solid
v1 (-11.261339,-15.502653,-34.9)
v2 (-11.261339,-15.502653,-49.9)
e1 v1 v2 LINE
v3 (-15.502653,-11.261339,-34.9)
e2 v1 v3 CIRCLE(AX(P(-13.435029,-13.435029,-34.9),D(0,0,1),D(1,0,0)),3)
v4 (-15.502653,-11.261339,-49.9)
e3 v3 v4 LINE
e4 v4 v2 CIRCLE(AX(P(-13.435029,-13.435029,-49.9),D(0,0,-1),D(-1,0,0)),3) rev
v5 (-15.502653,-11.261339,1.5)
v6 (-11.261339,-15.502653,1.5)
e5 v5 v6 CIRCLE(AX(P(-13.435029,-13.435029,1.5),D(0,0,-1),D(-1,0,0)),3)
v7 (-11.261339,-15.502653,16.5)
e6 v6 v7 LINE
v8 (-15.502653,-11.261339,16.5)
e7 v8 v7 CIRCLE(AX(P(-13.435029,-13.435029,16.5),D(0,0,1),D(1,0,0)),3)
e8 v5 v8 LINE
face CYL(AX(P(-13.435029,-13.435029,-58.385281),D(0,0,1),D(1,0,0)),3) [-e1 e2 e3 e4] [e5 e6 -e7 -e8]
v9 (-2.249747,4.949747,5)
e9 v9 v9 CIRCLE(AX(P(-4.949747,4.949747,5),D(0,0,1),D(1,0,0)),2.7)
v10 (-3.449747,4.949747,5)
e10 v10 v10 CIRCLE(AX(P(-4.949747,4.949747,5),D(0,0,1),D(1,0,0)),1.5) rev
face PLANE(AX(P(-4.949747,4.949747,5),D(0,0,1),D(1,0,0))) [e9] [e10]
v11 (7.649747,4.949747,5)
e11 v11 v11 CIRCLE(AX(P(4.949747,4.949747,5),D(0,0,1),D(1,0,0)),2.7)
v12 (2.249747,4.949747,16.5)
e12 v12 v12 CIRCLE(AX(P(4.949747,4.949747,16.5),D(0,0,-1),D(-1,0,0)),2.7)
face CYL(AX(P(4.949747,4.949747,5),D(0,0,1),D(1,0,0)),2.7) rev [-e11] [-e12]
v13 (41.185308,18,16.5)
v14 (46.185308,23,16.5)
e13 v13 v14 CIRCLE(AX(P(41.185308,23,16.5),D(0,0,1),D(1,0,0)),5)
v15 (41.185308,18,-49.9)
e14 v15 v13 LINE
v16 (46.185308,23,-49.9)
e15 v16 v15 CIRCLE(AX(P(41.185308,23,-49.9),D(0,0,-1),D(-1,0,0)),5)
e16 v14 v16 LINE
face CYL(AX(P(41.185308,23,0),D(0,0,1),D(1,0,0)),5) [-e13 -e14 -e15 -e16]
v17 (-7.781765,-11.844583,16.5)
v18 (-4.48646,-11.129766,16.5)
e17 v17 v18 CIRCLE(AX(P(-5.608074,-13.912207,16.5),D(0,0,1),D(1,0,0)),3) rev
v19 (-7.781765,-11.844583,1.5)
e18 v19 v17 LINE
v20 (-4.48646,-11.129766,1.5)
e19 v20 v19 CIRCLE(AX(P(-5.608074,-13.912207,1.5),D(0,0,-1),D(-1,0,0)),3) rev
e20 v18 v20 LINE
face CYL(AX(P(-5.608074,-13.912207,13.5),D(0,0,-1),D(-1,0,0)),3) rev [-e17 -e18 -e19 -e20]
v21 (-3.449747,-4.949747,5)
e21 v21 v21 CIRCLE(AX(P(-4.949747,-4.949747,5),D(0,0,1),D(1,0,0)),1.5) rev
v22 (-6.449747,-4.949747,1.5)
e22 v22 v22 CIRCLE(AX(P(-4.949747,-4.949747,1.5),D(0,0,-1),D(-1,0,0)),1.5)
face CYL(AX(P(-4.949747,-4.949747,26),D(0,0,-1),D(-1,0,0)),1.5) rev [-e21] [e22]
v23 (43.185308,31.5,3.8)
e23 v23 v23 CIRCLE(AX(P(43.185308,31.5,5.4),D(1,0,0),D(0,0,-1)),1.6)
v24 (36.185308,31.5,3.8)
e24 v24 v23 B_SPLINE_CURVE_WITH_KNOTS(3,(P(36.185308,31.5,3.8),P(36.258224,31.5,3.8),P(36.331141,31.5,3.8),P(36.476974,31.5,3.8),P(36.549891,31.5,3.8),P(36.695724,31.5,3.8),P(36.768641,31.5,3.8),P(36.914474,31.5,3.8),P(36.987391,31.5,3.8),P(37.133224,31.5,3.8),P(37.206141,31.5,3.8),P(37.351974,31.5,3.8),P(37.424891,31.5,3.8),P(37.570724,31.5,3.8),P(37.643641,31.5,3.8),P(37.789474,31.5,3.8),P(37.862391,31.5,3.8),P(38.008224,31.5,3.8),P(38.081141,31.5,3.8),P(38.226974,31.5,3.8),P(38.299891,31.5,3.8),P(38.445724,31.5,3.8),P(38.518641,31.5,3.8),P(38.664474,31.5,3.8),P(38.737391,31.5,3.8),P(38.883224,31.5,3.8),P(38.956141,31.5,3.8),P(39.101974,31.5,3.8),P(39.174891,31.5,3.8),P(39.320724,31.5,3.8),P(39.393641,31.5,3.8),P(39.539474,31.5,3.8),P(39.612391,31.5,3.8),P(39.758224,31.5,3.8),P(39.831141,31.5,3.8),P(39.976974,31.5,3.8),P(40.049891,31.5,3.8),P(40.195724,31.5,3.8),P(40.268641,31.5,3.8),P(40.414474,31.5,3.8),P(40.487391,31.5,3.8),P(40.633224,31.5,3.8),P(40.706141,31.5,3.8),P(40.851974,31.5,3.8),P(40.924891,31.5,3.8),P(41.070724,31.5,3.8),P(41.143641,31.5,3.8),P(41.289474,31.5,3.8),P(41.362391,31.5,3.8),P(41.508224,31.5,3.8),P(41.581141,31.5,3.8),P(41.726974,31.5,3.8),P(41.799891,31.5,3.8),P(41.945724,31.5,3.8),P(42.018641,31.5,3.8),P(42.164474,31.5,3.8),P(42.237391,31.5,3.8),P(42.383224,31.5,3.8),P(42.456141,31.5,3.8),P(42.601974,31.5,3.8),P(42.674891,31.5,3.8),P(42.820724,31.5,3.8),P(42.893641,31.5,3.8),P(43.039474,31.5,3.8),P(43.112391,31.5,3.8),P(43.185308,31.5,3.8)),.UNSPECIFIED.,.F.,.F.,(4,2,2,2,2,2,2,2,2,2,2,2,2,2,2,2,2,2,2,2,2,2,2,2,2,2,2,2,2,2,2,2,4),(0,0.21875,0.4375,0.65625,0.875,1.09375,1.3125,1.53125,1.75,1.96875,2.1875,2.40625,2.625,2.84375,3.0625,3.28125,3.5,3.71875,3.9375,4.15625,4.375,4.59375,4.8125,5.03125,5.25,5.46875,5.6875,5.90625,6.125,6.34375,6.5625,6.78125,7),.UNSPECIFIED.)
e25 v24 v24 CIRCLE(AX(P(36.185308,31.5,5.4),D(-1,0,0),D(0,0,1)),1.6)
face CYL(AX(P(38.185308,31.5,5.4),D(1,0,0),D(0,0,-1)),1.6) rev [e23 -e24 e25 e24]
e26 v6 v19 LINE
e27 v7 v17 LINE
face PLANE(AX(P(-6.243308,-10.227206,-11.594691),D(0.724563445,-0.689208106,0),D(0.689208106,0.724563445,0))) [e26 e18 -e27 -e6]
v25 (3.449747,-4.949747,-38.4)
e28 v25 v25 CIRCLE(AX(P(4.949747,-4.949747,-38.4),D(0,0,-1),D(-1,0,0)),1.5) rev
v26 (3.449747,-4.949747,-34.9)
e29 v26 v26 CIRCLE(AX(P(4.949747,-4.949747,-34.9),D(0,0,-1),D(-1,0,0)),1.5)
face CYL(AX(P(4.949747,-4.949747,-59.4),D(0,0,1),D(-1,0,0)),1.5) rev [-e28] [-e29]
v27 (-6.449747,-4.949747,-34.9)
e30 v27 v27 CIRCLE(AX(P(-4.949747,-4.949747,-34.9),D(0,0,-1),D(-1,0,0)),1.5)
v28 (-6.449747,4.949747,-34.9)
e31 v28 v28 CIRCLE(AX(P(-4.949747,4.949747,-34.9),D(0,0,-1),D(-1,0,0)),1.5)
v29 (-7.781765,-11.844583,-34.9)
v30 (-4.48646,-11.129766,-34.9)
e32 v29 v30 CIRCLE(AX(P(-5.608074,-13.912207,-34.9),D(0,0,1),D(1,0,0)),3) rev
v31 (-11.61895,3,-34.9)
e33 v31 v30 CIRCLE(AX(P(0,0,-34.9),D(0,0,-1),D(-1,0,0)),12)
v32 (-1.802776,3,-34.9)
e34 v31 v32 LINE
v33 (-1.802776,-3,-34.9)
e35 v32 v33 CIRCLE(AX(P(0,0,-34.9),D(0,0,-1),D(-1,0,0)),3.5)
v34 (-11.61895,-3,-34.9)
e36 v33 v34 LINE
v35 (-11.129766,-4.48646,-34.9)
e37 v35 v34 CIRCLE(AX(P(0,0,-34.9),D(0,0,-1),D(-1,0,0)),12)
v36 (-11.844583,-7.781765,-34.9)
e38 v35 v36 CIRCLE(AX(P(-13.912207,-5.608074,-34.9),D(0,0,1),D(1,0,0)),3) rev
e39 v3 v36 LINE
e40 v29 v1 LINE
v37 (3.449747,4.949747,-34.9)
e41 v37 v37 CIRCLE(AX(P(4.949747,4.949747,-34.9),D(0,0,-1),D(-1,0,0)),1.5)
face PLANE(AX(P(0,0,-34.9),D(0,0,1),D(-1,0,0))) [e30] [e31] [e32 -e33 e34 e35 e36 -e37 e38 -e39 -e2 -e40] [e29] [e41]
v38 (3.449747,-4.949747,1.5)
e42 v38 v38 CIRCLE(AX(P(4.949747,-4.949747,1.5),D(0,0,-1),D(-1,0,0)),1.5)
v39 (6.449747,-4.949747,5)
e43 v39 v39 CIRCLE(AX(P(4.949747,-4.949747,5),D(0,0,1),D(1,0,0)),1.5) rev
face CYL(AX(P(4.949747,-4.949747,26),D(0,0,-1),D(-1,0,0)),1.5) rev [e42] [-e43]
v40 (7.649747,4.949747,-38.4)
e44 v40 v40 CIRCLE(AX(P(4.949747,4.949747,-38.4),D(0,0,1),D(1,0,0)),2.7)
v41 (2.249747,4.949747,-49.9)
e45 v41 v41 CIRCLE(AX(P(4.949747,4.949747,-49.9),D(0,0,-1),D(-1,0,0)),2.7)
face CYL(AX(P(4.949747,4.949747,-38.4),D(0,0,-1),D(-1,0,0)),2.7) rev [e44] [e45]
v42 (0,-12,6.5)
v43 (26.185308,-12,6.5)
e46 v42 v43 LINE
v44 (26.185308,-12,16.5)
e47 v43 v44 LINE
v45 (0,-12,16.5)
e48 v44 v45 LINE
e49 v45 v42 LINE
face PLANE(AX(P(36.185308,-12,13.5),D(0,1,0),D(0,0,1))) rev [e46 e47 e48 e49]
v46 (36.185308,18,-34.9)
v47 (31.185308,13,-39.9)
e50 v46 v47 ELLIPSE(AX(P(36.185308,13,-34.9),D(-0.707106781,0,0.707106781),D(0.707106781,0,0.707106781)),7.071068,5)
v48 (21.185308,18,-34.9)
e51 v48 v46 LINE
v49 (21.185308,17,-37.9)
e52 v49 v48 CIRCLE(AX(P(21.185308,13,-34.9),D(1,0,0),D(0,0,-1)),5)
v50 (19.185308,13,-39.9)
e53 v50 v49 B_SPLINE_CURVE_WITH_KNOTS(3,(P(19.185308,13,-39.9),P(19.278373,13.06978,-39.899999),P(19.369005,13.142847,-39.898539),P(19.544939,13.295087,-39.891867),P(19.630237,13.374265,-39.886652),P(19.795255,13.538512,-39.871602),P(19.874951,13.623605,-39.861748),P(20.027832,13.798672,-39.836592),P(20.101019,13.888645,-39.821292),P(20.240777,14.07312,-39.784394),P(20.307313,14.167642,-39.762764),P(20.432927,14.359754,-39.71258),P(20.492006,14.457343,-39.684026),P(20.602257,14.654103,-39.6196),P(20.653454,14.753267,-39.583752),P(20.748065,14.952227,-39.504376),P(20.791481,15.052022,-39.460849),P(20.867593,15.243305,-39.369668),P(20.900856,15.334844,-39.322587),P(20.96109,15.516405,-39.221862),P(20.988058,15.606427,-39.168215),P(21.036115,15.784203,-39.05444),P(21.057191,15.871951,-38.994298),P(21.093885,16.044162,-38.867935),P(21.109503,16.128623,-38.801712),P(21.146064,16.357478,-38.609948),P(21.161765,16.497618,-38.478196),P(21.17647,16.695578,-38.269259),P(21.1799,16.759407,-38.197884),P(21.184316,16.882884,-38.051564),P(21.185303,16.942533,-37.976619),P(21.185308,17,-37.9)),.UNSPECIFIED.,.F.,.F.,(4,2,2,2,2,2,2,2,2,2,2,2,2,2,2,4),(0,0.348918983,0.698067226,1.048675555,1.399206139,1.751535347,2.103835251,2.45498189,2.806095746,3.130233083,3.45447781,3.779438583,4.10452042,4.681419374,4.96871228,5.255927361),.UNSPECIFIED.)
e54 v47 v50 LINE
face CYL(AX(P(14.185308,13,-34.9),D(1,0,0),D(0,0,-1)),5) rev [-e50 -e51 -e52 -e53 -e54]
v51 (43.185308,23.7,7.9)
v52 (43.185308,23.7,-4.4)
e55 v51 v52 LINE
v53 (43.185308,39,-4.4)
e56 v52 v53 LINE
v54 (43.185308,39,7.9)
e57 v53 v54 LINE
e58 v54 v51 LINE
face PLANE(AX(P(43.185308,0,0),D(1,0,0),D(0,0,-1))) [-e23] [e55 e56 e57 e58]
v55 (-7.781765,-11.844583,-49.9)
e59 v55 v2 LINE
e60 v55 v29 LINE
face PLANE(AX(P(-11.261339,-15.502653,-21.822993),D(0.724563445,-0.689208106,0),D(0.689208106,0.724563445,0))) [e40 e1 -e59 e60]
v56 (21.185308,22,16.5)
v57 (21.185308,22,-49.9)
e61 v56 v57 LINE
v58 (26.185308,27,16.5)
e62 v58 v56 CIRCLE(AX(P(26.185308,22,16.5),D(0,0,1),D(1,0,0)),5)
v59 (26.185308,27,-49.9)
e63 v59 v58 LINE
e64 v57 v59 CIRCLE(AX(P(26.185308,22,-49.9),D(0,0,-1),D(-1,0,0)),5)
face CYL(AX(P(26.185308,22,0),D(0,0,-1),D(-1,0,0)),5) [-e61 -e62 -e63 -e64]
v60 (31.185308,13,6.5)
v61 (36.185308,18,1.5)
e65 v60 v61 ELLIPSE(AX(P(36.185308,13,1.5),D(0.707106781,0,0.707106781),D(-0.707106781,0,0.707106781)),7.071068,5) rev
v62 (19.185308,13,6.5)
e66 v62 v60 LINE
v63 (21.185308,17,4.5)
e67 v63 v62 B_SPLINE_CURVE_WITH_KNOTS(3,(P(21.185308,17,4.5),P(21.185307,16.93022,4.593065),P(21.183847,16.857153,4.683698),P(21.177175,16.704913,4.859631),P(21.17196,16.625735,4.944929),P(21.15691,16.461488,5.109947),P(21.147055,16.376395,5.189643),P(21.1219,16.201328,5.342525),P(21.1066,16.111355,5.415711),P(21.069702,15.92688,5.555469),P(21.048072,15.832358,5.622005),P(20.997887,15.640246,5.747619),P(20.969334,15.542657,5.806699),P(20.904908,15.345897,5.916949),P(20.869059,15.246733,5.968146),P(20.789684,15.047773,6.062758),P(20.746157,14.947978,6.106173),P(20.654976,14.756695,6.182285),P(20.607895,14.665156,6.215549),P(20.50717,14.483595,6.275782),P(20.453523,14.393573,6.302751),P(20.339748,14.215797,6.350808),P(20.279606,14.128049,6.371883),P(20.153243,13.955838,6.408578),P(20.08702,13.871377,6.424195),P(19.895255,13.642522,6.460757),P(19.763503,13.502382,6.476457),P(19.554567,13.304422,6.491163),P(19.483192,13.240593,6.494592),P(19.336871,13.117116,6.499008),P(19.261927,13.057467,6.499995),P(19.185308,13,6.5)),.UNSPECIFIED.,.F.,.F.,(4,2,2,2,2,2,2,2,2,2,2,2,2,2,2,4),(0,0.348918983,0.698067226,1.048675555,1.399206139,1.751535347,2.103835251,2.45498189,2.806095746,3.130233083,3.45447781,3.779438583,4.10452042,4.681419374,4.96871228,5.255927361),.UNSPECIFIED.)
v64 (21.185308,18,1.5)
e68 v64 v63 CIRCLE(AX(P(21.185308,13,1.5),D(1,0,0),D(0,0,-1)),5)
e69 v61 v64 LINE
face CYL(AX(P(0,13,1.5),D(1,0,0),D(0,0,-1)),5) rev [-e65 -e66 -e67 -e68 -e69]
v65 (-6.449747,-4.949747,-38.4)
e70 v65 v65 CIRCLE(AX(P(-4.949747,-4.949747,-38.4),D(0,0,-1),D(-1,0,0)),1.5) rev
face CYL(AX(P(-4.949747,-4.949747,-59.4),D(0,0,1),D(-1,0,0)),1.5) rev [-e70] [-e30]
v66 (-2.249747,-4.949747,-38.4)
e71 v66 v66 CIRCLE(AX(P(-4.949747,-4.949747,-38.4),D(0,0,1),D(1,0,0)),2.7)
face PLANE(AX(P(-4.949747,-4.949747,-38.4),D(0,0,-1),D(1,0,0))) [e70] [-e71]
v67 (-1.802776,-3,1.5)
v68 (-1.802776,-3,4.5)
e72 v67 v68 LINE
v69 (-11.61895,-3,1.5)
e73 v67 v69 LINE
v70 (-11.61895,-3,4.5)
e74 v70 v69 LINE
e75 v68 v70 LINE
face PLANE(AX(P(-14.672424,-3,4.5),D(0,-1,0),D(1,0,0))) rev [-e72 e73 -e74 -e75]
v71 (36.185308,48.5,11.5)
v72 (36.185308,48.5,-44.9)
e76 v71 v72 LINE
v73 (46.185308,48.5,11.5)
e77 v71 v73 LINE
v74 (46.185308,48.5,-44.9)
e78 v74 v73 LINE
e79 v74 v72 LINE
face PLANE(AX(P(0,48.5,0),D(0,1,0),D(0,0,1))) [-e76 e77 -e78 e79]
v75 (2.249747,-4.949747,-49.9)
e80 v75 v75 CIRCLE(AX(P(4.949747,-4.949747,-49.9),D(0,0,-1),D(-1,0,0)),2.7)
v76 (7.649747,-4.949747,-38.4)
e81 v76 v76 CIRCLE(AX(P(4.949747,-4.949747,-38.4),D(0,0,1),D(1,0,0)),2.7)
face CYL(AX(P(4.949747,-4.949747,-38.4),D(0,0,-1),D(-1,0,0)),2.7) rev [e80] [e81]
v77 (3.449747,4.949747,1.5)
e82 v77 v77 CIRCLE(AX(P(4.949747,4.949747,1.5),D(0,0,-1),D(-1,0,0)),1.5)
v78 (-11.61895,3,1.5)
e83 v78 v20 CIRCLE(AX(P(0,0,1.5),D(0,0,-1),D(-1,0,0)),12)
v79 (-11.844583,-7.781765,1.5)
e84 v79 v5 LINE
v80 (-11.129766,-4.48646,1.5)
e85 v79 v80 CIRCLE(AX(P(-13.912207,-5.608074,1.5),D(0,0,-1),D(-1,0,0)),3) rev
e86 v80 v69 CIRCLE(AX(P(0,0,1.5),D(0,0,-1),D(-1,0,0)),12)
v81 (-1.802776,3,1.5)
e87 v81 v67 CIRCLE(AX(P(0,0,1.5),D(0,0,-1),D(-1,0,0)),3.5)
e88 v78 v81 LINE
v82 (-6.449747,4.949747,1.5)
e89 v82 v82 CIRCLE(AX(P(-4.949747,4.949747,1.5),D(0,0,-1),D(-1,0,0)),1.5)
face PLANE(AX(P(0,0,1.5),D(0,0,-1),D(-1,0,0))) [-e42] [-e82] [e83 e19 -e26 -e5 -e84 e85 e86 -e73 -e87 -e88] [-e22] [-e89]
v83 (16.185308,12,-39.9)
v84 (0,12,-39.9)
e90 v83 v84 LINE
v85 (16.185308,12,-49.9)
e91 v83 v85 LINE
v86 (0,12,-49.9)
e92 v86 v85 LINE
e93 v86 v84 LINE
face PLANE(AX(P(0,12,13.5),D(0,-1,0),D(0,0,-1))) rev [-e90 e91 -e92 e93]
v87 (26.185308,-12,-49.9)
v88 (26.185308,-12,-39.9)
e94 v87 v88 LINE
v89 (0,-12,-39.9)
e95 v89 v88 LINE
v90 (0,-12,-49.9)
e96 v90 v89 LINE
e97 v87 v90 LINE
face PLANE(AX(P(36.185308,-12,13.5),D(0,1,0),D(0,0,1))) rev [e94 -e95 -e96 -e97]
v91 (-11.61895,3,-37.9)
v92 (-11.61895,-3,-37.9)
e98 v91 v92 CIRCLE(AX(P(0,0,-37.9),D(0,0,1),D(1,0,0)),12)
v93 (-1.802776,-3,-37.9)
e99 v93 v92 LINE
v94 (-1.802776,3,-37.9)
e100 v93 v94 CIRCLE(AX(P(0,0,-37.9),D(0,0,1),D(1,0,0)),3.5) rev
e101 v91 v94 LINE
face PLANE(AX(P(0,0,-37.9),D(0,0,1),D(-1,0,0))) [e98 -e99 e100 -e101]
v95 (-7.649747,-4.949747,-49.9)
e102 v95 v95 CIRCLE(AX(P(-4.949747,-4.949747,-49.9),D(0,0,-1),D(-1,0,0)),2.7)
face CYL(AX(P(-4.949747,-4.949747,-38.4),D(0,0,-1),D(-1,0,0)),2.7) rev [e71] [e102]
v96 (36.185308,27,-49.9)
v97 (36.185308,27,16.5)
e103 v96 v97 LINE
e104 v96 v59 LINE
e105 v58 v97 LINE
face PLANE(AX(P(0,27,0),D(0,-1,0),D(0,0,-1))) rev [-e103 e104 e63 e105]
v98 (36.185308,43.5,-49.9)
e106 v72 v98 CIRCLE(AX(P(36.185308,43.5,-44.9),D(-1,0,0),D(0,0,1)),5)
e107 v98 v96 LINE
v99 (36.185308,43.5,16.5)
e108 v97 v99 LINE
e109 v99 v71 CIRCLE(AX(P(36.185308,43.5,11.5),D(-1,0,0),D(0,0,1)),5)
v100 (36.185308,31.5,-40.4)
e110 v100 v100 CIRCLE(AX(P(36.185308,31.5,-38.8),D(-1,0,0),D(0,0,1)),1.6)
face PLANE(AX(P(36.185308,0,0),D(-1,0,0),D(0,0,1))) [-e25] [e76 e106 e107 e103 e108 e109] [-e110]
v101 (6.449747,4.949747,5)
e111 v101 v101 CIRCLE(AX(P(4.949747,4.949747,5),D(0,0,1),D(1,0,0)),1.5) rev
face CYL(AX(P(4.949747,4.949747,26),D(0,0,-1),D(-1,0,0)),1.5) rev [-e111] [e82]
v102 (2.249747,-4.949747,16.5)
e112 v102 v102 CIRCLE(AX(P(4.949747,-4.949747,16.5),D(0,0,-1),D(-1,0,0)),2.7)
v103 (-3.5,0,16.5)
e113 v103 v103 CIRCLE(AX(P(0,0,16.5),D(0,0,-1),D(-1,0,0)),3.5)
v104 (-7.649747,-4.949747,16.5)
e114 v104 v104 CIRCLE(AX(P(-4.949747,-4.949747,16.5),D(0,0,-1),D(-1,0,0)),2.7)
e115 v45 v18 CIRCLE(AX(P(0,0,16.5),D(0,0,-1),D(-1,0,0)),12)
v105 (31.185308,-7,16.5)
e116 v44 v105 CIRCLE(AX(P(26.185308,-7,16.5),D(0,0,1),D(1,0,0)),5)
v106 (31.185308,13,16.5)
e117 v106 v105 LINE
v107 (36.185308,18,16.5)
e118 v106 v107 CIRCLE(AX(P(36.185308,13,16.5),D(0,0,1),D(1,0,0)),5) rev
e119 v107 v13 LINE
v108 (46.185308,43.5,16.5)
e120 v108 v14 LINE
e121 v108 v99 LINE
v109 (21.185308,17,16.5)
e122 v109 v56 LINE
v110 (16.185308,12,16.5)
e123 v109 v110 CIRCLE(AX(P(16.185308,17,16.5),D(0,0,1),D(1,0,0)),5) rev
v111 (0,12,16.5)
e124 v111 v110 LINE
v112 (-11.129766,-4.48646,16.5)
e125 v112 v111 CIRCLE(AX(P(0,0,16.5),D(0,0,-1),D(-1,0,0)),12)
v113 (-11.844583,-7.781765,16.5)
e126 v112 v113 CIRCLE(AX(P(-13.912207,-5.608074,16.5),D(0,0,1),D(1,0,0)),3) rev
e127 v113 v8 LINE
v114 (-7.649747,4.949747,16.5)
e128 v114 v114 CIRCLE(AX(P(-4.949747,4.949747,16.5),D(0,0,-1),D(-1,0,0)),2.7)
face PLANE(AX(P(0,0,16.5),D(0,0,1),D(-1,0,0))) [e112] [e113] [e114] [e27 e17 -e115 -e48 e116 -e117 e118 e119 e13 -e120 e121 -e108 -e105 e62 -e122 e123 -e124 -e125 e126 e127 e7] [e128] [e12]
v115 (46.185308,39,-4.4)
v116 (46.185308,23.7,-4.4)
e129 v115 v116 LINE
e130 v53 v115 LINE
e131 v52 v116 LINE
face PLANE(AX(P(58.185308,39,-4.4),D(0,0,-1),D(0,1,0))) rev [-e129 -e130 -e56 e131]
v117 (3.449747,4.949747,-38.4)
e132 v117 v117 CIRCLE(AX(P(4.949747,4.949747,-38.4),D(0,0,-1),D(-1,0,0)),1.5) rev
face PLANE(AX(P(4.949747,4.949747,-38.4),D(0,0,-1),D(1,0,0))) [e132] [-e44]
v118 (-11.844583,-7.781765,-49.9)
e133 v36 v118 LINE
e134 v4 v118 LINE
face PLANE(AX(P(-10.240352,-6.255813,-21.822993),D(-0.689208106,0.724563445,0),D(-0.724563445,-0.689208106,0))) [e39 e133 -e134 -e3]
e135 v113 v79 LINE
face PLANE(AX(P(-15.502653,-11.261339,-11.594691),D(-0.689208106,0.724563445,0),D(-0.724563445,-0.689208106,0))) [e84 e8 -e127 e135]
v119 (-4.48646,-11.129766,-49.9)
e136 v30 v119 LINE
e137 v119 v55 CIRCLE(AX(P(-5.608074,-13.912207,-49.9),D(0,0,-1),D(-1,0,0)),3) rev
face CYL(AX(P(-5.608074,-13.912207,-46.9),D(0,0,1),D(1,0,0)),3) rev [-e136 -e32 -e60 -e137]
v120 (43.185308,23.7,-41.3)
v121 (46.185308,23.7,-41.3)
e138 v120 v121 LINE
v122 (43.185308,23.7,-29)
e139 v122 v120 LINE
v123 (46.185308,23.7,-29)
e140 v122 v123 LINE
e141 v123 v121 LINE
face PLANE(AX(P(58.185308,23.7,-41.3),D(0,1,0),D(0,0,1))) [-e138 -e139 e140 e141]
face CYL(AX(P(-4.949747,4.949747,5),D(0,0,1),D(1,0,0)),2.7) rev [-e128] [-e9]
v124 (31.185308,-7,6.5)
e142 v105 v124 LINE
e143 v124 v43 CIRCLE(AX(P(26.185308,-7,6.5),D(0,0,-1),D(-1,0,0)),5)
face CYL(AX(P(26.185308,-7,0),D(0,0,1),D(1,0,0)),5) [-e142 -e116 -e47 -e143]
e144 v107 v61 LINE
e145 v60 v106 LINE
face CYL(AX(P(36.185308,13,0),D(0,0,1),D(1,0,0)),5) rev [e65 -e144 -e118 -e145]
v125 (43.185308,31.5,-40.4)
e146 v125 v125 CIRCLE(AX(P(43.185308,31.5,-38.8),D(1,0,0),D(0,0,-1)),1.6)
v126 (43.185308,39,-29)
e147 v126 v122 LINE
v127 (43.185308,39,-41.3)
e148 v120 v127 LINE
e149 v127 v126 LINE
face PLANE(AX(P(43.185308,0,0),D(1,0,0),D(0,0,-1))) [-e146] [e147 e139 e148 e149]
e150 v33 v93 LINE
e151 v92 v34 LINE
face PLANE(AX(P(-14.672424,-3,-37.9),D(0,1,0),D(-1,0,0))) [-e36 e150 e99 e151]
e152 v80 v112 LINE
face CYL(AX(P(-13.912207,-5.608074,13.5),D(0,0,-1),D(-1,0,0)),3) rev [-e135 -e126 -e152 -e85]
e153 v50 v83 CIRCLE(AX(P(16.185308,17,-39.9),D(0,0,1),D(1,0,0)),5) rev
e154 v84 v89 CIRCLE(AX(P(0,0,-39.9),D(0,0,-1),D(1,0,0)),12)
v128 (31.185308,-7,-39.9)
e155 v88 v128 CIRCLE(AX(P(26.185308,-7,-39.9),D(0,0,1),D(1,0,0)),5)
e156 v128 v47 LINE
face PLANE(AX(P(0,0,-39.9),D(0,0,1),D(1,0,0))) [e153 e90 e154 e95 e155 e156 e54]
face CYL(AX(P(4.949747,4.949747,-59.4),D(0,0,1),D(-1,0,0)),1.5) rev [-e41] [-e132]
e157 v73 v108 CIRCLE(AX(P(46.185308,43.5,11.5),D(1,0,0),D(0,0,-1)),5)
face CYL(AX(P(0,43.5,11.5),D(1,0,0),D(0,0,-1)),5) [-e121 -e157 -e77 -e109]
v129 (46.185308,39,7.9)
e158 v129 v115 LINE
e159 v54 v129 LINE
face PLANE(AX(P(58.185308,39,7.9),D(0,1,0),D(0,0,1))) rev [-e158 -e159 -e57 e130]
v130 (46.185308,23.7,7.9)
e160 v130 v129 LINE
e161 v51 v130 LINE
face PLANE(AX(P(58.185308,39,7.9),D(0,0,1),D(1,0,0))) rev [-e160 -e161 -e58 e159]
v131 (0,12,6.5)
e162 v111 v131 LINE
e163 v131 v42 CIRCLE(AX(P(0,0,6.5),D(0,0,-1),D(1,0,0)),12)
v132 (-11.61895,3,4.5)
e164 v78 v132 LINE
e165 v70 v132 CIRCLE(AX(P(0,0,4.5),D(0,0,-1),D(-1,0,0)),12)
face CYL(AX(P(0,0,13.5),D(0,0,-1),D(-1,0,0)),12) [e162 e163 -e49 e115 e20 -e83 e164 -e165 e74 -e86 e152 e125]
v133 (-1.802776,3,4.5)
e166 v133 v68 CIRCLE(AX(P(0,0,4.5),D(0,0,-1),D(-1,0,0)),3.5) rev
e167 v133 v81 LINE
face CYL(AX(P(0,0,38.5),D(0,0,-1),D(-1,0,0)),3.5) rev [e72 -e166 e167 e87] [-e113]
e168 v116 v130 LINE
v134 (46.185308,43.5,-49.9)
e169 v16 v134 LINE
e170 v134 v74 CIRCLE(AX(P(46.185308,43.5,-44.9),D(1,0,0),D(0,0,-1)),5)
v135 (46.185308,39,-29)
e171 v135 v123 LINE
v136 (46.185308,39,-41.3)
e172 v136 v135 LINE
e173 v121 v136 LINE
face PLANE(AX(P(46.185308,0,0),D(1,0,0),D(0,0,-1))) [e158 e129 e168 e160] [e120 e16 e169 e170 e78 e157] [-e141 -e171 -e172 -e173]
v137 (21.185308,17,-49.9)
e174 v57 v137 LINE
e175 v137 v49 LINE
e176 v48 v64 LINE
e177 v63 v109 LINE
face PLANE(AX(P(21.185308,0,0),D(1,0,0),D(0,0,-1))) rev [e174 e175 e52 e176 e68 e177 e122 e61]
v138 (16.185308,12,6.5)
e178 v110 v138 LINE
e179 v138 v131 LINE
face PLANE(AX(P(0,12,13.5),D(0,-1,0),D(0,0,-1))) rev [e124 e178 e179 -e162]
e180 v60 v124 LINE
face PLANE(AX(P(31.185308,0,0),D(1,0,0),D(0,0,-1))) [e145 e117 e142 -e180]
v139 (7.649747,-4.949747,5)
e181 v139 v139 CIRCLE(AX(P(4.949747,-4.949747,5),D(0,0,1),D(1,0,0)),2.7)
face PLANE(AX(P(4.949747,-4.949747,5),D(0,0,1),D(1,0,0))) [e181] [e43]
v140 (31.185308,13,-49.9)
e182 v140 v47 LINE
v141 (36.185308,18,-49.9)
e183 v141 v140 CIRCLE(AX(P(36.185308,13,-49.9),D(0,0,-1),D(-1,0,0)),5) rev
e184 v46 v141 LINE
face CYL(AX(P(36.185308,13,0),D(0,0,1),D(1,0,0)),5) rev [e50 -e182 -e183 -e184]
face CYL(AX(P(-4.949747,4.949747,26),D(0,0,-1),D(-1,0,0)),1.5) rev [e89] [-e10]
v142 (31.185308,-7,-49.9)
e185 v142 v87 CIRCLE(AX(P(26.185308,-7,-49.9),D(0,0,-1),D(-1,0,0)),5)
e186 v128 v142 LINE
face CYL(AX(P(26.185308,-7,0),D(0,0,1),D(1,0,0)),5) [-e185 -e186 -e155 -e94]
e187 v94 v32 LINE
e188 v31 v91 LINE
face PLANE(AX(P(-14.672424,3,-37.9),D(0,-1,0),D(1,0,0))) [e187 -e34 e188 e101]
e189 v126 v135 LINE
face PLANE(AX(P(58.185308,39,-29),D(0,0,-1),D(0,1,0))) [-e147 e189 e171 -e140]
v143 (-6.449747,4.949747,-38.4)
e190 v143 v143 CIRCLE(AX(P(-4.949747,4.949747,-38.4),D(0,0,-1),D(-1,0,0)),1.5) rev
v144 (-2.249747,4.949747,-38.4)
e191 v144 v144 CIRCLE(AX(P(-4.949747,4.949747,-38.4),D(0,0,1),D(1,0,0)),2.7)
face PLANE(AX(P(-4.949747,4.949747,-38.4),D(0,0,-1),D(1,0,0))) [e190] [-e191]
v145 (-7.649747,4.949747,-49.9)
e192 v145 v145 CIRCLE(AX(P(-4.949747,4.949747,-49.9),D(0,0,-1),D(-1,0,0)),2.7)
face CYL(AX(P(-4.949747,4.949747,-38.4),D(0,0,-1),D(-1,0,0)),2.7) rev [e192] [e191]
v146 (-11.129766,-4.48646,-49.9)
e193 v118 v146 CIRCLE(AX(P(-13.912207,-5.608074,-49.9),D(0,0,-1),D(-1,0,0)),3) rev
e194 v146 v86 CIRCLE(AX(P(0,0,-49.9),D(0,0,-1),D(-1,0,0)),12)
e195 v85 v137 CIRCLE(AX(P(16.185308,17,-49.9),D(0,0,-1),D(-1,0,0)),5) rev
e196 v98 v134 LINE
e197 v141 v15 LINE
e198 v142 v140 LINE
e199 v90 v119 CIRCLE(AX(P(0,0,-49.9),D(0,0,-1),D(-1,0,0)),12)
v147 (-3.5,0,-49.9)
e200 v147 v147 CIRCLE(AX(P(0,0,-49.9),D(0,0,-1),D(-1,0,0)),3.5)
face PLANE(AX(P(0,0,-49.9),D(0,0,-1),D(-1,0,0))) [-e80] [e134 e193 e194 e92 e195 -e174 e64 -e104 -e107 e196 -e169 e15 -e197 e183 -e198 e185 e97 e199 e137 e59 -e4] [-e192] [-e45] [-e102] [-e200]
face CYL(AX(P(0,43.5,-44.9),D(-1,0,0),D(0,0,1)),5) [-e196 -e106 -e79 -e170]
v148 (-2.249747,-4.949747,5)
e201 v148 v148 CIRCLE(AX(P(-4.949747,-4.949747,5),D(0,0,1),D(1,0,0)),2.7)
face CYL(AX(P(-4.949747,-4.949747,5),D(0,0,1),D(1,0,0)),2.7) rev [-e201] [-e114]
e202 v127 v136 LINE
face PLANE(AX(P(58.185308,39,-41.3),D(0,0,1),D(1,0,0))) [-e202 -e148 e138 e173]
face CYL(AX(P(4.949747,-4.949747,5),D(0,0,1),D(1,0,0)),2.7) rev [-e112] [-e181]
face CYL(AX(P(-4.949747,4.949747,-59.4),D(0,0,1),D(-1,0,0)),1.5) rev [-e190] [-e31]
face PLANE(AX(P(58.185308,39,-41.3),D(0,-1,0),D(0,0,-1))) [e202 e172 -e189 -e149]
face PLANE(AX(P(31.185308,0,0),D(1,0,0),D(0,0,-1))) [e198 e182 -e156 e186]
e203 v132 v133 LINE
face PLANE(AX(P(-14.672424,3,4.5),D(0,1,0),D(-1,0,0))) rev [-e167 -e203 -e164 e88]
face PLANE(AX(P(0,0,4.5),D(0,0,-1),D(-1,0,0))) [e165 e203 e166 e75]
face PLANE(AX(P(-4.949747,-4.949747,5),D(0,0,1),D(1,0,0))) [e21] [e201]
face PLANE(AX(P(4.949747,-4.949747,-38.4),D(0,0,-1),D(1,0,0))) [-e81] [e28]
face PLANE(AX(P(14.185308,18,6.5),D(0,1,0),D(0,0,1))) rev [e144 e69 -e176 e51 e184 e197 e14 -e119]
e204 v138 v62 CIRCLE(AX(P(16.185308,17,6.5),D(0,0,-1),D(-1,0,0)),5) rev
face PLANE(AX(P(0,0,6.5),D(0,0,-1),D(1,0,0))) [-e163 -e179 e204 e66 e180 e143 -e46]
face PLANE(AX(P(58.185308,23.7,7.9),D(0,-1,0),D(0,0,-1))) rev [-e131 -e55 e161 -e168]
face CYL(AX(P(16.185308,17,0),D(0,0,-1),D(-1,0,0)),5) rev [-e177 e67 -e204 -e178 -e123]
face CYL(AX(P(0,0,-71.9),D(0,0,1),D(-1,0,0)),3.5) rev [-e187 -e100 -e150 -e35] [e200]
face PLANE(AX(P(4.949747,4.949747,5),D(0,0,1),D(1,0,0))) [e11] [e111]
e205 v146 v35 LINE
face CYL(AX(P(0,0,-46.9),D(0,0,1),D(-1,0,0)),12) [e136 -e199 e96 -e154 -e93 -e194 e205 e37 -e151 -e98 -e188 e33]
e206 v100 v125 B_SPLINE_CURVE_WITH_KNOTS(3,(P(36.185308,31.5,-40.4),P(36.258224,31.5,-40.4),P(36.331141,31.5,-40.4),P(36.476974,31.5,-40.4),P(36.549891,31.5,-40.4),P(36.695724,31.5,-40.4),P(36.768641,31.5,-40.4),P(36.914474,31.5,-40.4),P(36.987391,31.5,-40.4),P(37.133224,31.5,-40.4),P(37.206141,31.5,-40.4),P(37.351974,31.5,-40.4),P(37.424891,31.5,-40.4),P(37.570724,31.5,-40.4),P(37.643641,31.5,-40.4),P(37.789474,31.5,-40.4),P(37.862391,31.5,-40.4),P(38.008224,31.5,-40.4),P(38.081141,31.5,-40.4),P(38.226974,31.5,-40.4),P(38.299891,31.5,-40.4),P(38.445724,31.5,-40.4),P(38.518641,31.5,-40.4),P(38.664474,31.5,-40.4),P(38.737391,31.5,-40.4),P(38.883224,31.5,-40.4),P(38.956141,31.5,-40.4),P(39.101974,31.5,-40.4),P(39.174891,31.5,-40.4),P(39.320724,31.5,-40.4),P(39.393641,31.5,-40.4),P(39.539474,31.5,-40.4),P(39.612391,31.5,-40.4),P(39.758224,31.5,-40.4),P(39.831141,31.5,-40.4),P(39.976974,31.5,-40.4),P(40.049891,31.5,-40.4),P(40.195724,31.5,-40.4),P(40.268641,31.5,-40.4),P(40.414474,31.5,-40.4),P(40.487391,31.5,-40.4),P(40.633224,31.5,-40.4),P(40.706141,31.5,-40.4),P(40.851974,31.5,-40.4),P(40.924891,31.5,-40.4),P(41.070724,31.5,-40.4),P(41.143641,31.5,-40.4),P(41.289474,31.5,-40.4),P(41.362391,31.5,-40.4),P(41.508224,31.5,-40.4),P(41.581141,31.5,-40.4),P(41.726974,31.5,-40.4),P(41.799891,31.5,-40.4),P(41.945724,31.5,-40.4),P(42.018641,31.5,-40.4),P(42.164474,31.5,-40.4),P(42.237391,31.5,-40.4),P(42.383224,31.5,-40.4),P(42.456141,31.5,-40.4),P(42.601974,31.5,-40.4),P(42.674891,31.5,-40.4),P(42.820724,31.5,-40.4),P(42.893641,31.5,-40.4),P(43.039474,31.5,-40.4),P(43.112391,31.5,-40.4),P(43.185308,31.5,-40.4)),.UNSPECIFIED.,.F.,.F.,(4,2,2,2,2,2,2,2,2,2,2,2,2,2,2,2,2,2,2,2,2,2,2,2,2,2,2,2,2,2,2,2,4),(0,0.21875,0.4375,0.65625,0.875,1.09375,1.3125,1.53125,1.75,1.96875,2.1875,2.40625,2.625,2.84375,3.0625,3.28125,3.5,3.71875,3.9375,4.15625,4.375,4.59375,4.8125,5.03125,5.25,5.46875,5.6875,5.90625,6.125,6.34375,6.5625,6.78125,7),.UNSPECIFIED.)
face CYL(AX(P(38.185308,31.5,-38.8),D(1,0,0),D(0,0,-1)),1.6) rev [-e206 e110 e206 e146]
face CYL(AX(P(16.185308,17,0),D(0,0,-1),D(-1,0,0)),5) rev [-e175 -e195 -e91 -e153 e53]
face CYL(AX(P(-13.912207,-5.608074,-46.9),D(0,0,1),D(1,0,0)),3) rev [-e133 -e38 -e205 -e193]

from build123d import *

# Parameters (mm, degrees)
EXTRUDE_1_DEPTH      = 13.5
SKETCH_5_R           = 10.1
CUT_EXTRUDE_2_DEPTH  = 1.5
SKETCH_7_R           = 3.5
CUT_EXTRUDE_3_DEPTH  = 37
SKETCH_9_R           = 1.5
CUT_EXTRUDE_4_DEPTH  = 24.5
SKETCH_11_W          = 60.4
SKETCH_11_H          = 24
EXTRUDE_2_DEPTH      = 25
SKETCH_12_R          = 2.7
CUT_EXTRUDE_5_DEPTH  = 8.5
SKETCH_18_R          = 12
CUT_EXTRUDE_9_DEPTH  = 1.5
SKETCH_19_W          = 14.67242397
SKETCH_19_H          = 6
CUT_EXTRUDE_10_DEPTH = 3
SKETCH_20_W          = 76.507524202
SKETCH_20_H          = 37.102074034
CUT_EXTRUDE_11_DEPTH = 3.5
SKETCH_21_R          = 2.7
SKETCH_21_R_2        = 3.5
EXTRUDE_3_DEPTH      = 6.5
CUT_EXTRUDE_12_DEPTH = 6.5
SKETCH_23_W          = 10
SKETCH_23_H          = 66.4
EXTRUDE_4_DEPTH      = 30
SKETCH_24_W          = 25
SKETCH_24_H          = 66.4
EXTRUDE_5_DEPTH      = 15
SKETCH_25_W          = 12.3
SKETCH_25_H          = 15.3
CUT_EXTRUDE_13_DEPTH = 3
SKETCH_26_R          = 1.6
CUT_EXTRUDE_14_DEPTH = 20
SKETCH_27_W          = 46.4
SKETCH_27_H          = 30
CUT_EXTRUDE_15_DEPTH = 47
SKETCH_28_W          = 66.4
SKETCH_28_H          = 30
CUT_EXTRUDE_16_DEPTH = 15
SKETCH_29_W          = 10
SKETCH_29_H          = 66.4
EXTRUDE_6_DEPTH      = 6.5
SKETCH_30_R          = 3
EXTRUDE_7_DEPTH      = 66.4
EXTRUDE_8_DEPTH      = 15
EXTRUDE_9_DEPTH      = 15
FILLET_9_R           = 3
EXTRUDE_10_DEPTH     = 5
SKETCH_34_W          = 66.4
SKETCH_34_H          = 30
CUT_EXTRUDE_17_DEPTH = 15
SKETCH_35_W          = 66.4
SKETCH_35_H          = 21.5
SKETCH_35_R          = 1.6
EXTRUDE_11_DEPTH     = 15
SKETCH_36_W          = 12.3
SKETCH_36_H          = 15.3
SKETCH_36_R          = 1.6
CUT_EXTRUDE_18_DEPTH = 15
SKETCH_37_W          = 66.4
SKETCH_37_H          = 30.5
CUT_EXTRUDE_19_DEPTH = 15
FILLET_10_R          = 5
FILLET_11_R          = 5


with BuildPart() as part:
    # 草图1 → 凸台-拉伸1 (new body)
    with BuildSketch(Plane.XY):
        with BuildLine():
            Line((0, 12), (36.185307738, 12))
            Line((36.185307738, 12), (36.185307738, -12))
            Line((36.185307738, -12), (0, -12))
            ThreePointArc((0, -12), (-12, 0), (0, 12))
        make_face()
    extrude(amount=EXTRUDE_1_DEPTH)

    # 草图5 → 切除-拉伸2 (cut)
    with BuildSketch(Plane(origin=(0, 0, 0), x_dir=(-1, 0, 0), z_dir=(0, 0, -1))):
        Circle(SKETCH_5_R)
    extrude(amount=-CUT_EXTRUDE_2_DEPTH, mode=Mode.SUBTRACT)

    # 草图7 → 切除-拉伸3 (cut)
    with BuildSketch(Plane(origin=(0, 0, 1.5), x_dir=(-1, 0, 0), z_dir=(0, 0, -1))):
        Circle(SKETCH_7_R)
    extrude(amount=-CUT_EXTRUDE_3_DEPTH, mode=Mode.SUBTRACT)

    # 草图9 → 切除-拉伸4 (cut)
    with BuildSketch(Plane(origin=(0, 0, 1.5), x_dir=(-1, 0, 0), z_dir=(0, 0, -1))):
        with Locations((-4.949747468, 4.949747468)):
            Circle(SKETCH_9_R)
        with Locations((4.949747468, 4.949747468)):
            Circle(SKETCH_9_R)
        with Locations((4.949747468, -4.949747468)):
            Circle(SKETCH_9_R)
        with Locations((-4.949747468, -4.949747468)):
            Circle(SKETCH_9_R)
    extrude(amount=-CUT_EXTRUDE_4_DEPTH, mode=Mode.SUBTRACT)


with BuildPart() as body_2:
    # 镜向14: mirrored copy
    add(part.part.mirror(Plane(origin=(0, 0, -16.7), x_dir=(1, 0, 0), z_dir=(0, 0, -1))))


with BuildPart() as part_1:
    add(part.part)

    add(body_2.part)  # 凸台-拉伸2 merges body 2
    # 草图11 → 凸台-拉伸2 (add)
    with BuildSketch(Plane(origin=(36.185307738, 0, 0), x_dir=(0, 0, -1), z_dir=(1, 0, 0))):
        with Locations((16.7, 0)):
            Rectangle(SKETCH_11_W, SKETCH_11_H)
    extrude(amount=EXTRUDE_2_DEPTH)

    # 草图12 → 切除-拉伸5 (cut)
    with BuildSketch(Plane.XY.offset(13.5)):
        with Locations((4.949747468, 4.949747468)):
            Circle(SKETCH_12_R)
        with Locations((4.949747468, -4.949747468)):
            Circle(SKETCH_12_R)
        with Locations((-4.949747468, -4.949747468)):
            Circle(SKETCH_12_R)
        with Locations((-4.949747468, 4.949747468)):
            Circle(SKETCH_12_R)
    cut_extrude_5 = extrude(amount=-CUT_EXTRUDE_5_DEPTH, mode=Mode.SUBTRACT)

    # 草图18 → 切除-拉伸9 (cut)
    with BuildSketch(Plane(origin=(0, 0, 0), x_dir=(-1, 0, 0), z_dir=(0, 0, -1))):
        Circle(SKETCH_18_R)
    cut_extrude_9 = extrude(amount=-CUT_EXTRUDE_9_DEPTH, mode=Mode.SUBTRACT)

    # 草图19 → 切除-拉伸10 (cut)
    with BuildSketch(Plane(origin=(0, 0, 1.5), x_dir=(-1, 0, 0), z_dir=(0, 0, -1))):
        with Locations((7.336211985, 0)):
            Rectangle(SKETCH_19_W, SKETCH_19_H)
    cut_extrude_10 = extrude(amount=-CUT_EXTRUDE_10_DEPTH, mode=Mode.SUBTRACT)

    # 草图20 → 切除-拉伸11 (cut)
    with BuildSketch(Plane.XY.offset(13.5)):
        with Locations((20.283666709, 0.248055891)):
            Rectangle(SKETCH_20_W, SKETCH_20_H)
    cut_extrude_11 = extrude(amount=-CUT_EXTRUDE_11_DEPTH, mode=Mode.SUBTRACT)

    # 镜向24: 切除-拉伸5, 切除-拉伸9, 切除-拉伸10 across plane
    add(cut_extrude_5.mirror(Plane(origin=(0, 0, -16.7), x_dir=(1, 0, 0), z_dir=(0, 0, -1))), mode=Mode.SUBTRACT)
    add(cut_extrude_9.mirror(Plane(origin=(0, 0, -16.7), x_dir=(1, 0, 0), z_dir=(0, 0, -1))), mode=Mode.SUBTRACT)
    add(cut_extrude_10.mirror(Plane(origin=(0, 0, -16.7), x_dir=(1, 0, 0), z_dir=(0, 0, -1))), mode=Mode.SUBTRACT)

    # 镜向26: 切除-拉伸11 across plane
    add(cut_extrude_11.mirror(Plane(origin=(0, 0, -16.7), x_dir=(1, 0, 0), z_dir=(0, 0, -1))), mode=Mode.SUBTRACT)

    # 草图21 → 凸台-拉伸3 (add)
    with BuildSketch(Plane(origin=(0, 0, -43.4), x_dir=(-1, 0, 0), z_dir=(0, 0, -1))):
        with BuildLine():
            Line((0, 12), (-61.185307738, 12))
            Line((-61.185307738, 12), (-61.185307738, -12))
            Line((-61.185307738, -12), (0, -12))
            ThreePointArc((0, -12), (12, 0), (0, 12))
        make_face()
        with Locations((4.949747468, -4.949747468)):
            Circle(SKETCH_21_R, mode=Mode.SUBTRACT)
        Circle(SKETCH_21_R_2, mode=Mode.SUBTRACT)
        with Locations((4.949747468, 4.949747468)):
            Circle(SKETCH_21_R, mode=Mode.SUBTRACT)
        with Locations((-4.949747468, 4.949747468)):
            Circle(SKETCH_21_R, mode=Mode.SUBTRACT)
        with Locations((-4.949747468, -4.949747468)):
            Circle(SKETCH_21_R, mode=Mode.SUBTRACT)
    extrude_3 = extrude(amount=EXTRUDE_3_DEPTH)

    # 草图22 → 切除-拉伸12 (cut)
    with BuildSketch(Plane.XY.offset(-33.4)):
        with BuildLine():
            Line((0, -12), (36.185307738, -12))
            Line((36.185307738, -12), (36.185307738, 12))
            Line((36.185307738, 12), (0, 12))
            ThreePointArc((0, 12), (12, 0), (0, -12))
        make_face()
    cut_extrude_12 = extrude(amount=-CUT_EXTRUDE_12_DEPTH, mode=Mode.SUBTRACT)

    # 镜向27: 凸台-拉伸3, 切除-拉伸12 across plane
    add(extrude_3.mirror(Plane(origin=(0, 0, -16.7), x_dir=(1, 0, 0), z_dir=(0, 0, -1))))
    add(cut_extrude_12.mirror(Plane(origin=(0, 0, -16.7), x_dir=(1, 0, 0), z_dir=(0, 0, -1))), mode=Mode.SUBTRACT)

    # 草图23 → 凸台-拉伸4 (add)
    with BuildSketch(Plane(origin=(0, 12, 0), x_dir=(1, 0, 0), z_dir=(0, 1, 0))):
        with Locations((56.185307738, 16.7)):
            Rectangle(SKETCH_23_W, SKETCH_23_H)
    extrude(amount=EXTRUDE_4_DEPTH)

    # 草图24 → 凸台-拉伸5 (add)
    with BuildSketch(Plane(origin=(0, 12, 0), x_dir=(1, 0, 0), z_dir=(0, 1, 0))):
        with Locations((38.685307738, 16.7)):
            Rectangle(SKETCH_24_W, SKETCH_24_H)
    extrude(amount=EXTRUDE_5_DEPTH)

    # 草图25 → 切除-拉伸13 (cut)
    with BuildSketch(Plane(origin=(61.185307738, 0, 0), x_dir=(0, 0, -1), z_dir=(1, 0, 0))):
        with Locations((-1.75, 31.35)):
            Rectangle(SKETCH_25_W, SKETCH_25_H)
    cut_extrude_13 = extrude(amount=-CUT_EXTRUDE_13_DEPTH, mode=Mode.SUBTRACT)

    # 草图26 → 切除-拉伸14 (cut)
    with BuildSketch(Plane(origin=(58.185307738, 0, 0), x_dir=(0, 0, -1), z_dir=(1, 0, 0))):
        with Locations((-5.4, 31.5)):
            Circle(SKETCH_26_R)
    cut_extrude_14 = extrude(amount=-CUT_EXTRUDE_14_DEPTH, mode=Mode.SUBTRACT)

    # 镜向28: 切除-拉伸13, 切除-拉伸14 across plane
    add(cut_extrude_13.mirror(Plane(origin=(0, 0, -16.7), x_dir=(1, 0, 0), z_dir=(0, 0, -1))), mode=Mode.SUBTRACT)
    add(cut_extrude_14.mirror(Plane(origin=(0, 0, -16.7), x_dir=(1, 0, 0), z_dir=(0, 0, -1))), mode=Mode.SUBTRACT)

    # 草图27 → 切除-拉伸15 (cut)
    with BuildSketch(Plane(origin=(61.185307738, 0, 0), x_dir=(0, 0, -1), z_dir=(1, 0, 0))):
        with Locations((16.7, 3)):
            Rectangle(SKETCH_27_W, SKETCH_27_H)
    extrude(amount=-CUT_EXTRUDE_15_DEPTH, mode=Mode.SUBTRACT)

    # 草图28 → 切除-拉伸16 (cut)
    with BuildSketch(Plane(origin=(61.185307738, 0, 0), x_dir=(0, 0, -1), z_dir=(1, 0, 0))):
        with Locations((16.7, 3)):
            Rectangle(SKETCH_28_W, SKETCH_28_H)
    extrude(amount=-CUT_EXTRUDE_16_DEPTH, mode=Mode.SUBTRACT)

    # 草图29 → 凸台-拉伸6 (add)
    with BuildSketch(Plane(origin=(0, 42, 0), x_dir=(1, 0, 0), z_dir=(0, 1, 0))):
        with Locations((56.185307738, 16.7)):
            Rectangle(SKETCH_29_W, SKETCH_29_H)
    extrude(amount=EXTRUDE_6_DEPTH)



with BuildPart() as body_2_2:
    # 草图30 → 凸台-拉伸7 (new body)
    with BuildSketch(Plane.XY.offset(16.5)):
        with Locations((-13.435028843, -13.435028843)):
            Circle(SKETCH_30_R)
    extrude(amount=-EXTRUDE_7_DEPTH)


with BuildPart() as part_2:
    add(part_1.part)

    add(body_2_2.part)  # 凸台-拉伸8 merges body 2 2
    # 草图31 → 凸台-拉伸8 (add)
    with BuildSketch(Plane.XY.offset(16.5)):
        with BuildLine():
            Line((-15.502653161, -11.261338507), (-10.227205569, -6.243308314))
            ThreePointArc((-10.227205569, -6.243308314), (-8.472739594, -8.472739594), (-6.243308314, -10.227205569))
            Line((-6.243308314, -10.227205569), (-11.261338507, -15.502653161))
            ThreePointArc((-11.261338507, -15.502653161), (-11.313708499, -11.313708499), (-15.502653161, -11.261338507))
        make_face()
    extrude(amount=-EXTRUDE_8_DEPTH)

    # 草图32 → 凸台-拉伸9 (add)
    with BuildSketch(Plane(origin=(0, 0, -49.9), x_dir=(-1, 0, 0), z_dir=(0, 0, -1))):
        with BuildLine():
            Line((11.261338507, -15.502653161), (6.255813007, -10.240351733))
            ThreePointArc((6.255813007, -10.240351733), (8.485281374, -8.485281374), (10.240351733, -6.255813007))
            Line((10.240351733, -6.255813007), (15.502653161, -11.261338507))
            ThreePointArc((15.502653161, -11.261338507), (11.313708499, -11.313708499), (11.261338507, -15.502653161))
        make_face()
    extrude(amount=-EXTRUDE_9_DEPTH)

    # 圆角9
    # the kernel refuses this fillet: 3 mm, written as the material it adds along each edge
    with BuildSketch(Plane(origin=(-6.255813007, -10.240351733, 16.5), x_dir=(-0.6892081062502396, -0.724563445309628, 0), z_dir=(0, 0, -1))) as fillet_9_piece_1:
        with BuildLine():
            CenterArc((2.214065381, -3), FILLET_9_R, 90, 68.387133701)
            ThreePointArc((-0.575016009, -1.895), (-0.248350543, -0.959381882), (0, 0))
            Line((0, 0), (2.214065381, 0))
        make_face()
    extrude(amount=15)
    with BuildSketch(Plane(origin=(-10.240351733, -6.255813007, 16.5), x_dir=(-0.44912622978697236, 0.8934683148927777, 0), z_dir=(0, 0, -1)), Plane(origin=(-6.255813007, -10.240351733, -49.9), x_dir=(0.8934683148928326, -0.44912622978686306, 0), z_dir=(0, 0, 1))) as fillet_9_piece_2:
        with BuildLine():
            CenterArc((2.227860315, -2.989769879), FILLET_9_R, 94.733047606, 68.387133701)
            Line((-0.642887442, -2.118674409), (0, 0))
            ThreePointArc((0, 0), (0.99016014, -0.040920483), (1.98032028, 0))
        make_face()
    extrude(amount=15)
    with BuildSketch(Plane(origin=(-10.240351733, -6.255813007, -49.9), x_dir=(-0.449126229786972, 0.8934683148927778, 0), z_dir=(0, 0, 1))) as fillet_9_piece_3:
        with BuildLine():
            CenterArc((2.227860315, 2.989769879), FILLET_9_R, 196.879818692, 68.387133701)
            Line((-0.642887442, 2.118674409), (0, 0))
            ThreePointArc((0, 0), (0.99016014, 0.040920483), (1.98032028, 0))
        make_face()
    extrude(amount=15)

    # 草图33 → 凸台-拉伸10 (add)
    with BuildSketch(Plane.ZY.offset(-26.185307738)):
        Polygon((-39.9, 18), (6.5, 18), (6.5, 12), (16.5, 12), (16.5, 27), (-49.9, 27), (-49.9, 12), (-39.9, 12), align=None)
    extrude(amount=EXTRUDE_10_DEPTH)

    # 草图34 → 切除-拉伸17 (cut)
    with BuildSketch(Plane(origin=(46.185307738, 0, 0), x_dir=(0, 0, -1), z_dir=(1, 0, 0))):
        with Locations((16.7, 3)):
            Rectangle(SKETCH_34_W, SKETCH_34_H)
    extrude(amount=-CUT_EXTRUDE_17_DEPTH, mode=Mode.SUBTRACT)

    # 草图35 → 凸台-拉伸11 (add)
    with BuildSketch(Plane.ZY.offset(-51.185307738)):
        with Locations((-16.7, 37.75)):
            Rectangle(SKETCH_35_W, SKETCH_35_H)
        with Locations(Location((5.4, 31.5, 0), (0, 0, 180))):
            Circle(SKETCH_35_R, mode=Mode.SUBTRACT)
        with Locations(Location((-38.8, 31.5, 0), (0, 0, 180))):
            Circle(SKETCH_35_R, mode=Mode.SUBTRACT)
    extrude(amount=EXTRUDE_11_DEPTH)

    # 草图36 → 切除-拉伸18 (cut)
    # profile 1 of 2: a face of its own
    with BuildSketch(Plane(origin=(58.185307738, 0, 0), x_dir=(0, 0, -1), z_dir=(1, 0, 0))):
        with Locations((35.15, 31.35)):
            Rectangle(SKETCH_36_W, SKETCH_36_H)
        with Locations((38.8, 31.5)):
            Circle(SKETCH_36_R, mode=Mode.SUBTRACT)
    # profile 2 of 2: a face of its own
    with BuildSketch(Plane(origin=(58.185307738, 0, 0), x_dir=(0, 0, -1), z_dir=(1, 0, 0))):
        with Locations((-1.75, 31.35)):
            Rectangle(SKETCH_36_W, SKETCH_36_H)
        with Locations((-5.4, 31.5)):
            Circle(SKETCH_36_R, mode=Mode.SUBTRACT)
    extrude(amount=-CUT_EXTRUDE_18_DEPTH, mode=Mode.SUBTRACT)

    # 草图37 → 切除-拉伸19 (cut)
    with BuildSketch(Plane(origin=(61.185307738, 0, 0), x_dir=(0, 0, -1), z_dir=(1, 0, 0))):
        with Locations((16.7, 33.25)):
            Rectangle(SKETCH_37_W, SKETCH_37_H)
    extrude(amount=-CUT_EXTRUDE_19_DEPTH, mode=Mode.SUBTRACT)

    # 圆角10
    fillet_10_edges = [part_2.edges().sort_by_distance(p)[0] for p in [
        (41.185307738, 48.5, 16.5),
        (21.185307738, 12, 11.5),
        (21.185307738, 27, -16.7),
        (21.185307738, 12, -44.9),
        (31.185307738, 18, -44.9),
        (31.185307738, -12, -44.9),
        (31.185307738, 18, 11.5),
        (31.185307738, -12, 11.5),
        (41.185307738, 48.5, -49.9),
        (46.185307738, 18, -16.7),
    ]]
    fillet(fillet_10_edges, radius=FILLET_10_R)

    # 圆角11
    fillet_11_edges = [part_2.edges().sort_by_distance(p)[0] for p in [
        (28.685307738, 18, -39.9),
        (31.185307738, 18, 6.5),
    ]]
    fillet(fillet_11_edges, radius=FILLET_11_R)


solid = part_2.part
